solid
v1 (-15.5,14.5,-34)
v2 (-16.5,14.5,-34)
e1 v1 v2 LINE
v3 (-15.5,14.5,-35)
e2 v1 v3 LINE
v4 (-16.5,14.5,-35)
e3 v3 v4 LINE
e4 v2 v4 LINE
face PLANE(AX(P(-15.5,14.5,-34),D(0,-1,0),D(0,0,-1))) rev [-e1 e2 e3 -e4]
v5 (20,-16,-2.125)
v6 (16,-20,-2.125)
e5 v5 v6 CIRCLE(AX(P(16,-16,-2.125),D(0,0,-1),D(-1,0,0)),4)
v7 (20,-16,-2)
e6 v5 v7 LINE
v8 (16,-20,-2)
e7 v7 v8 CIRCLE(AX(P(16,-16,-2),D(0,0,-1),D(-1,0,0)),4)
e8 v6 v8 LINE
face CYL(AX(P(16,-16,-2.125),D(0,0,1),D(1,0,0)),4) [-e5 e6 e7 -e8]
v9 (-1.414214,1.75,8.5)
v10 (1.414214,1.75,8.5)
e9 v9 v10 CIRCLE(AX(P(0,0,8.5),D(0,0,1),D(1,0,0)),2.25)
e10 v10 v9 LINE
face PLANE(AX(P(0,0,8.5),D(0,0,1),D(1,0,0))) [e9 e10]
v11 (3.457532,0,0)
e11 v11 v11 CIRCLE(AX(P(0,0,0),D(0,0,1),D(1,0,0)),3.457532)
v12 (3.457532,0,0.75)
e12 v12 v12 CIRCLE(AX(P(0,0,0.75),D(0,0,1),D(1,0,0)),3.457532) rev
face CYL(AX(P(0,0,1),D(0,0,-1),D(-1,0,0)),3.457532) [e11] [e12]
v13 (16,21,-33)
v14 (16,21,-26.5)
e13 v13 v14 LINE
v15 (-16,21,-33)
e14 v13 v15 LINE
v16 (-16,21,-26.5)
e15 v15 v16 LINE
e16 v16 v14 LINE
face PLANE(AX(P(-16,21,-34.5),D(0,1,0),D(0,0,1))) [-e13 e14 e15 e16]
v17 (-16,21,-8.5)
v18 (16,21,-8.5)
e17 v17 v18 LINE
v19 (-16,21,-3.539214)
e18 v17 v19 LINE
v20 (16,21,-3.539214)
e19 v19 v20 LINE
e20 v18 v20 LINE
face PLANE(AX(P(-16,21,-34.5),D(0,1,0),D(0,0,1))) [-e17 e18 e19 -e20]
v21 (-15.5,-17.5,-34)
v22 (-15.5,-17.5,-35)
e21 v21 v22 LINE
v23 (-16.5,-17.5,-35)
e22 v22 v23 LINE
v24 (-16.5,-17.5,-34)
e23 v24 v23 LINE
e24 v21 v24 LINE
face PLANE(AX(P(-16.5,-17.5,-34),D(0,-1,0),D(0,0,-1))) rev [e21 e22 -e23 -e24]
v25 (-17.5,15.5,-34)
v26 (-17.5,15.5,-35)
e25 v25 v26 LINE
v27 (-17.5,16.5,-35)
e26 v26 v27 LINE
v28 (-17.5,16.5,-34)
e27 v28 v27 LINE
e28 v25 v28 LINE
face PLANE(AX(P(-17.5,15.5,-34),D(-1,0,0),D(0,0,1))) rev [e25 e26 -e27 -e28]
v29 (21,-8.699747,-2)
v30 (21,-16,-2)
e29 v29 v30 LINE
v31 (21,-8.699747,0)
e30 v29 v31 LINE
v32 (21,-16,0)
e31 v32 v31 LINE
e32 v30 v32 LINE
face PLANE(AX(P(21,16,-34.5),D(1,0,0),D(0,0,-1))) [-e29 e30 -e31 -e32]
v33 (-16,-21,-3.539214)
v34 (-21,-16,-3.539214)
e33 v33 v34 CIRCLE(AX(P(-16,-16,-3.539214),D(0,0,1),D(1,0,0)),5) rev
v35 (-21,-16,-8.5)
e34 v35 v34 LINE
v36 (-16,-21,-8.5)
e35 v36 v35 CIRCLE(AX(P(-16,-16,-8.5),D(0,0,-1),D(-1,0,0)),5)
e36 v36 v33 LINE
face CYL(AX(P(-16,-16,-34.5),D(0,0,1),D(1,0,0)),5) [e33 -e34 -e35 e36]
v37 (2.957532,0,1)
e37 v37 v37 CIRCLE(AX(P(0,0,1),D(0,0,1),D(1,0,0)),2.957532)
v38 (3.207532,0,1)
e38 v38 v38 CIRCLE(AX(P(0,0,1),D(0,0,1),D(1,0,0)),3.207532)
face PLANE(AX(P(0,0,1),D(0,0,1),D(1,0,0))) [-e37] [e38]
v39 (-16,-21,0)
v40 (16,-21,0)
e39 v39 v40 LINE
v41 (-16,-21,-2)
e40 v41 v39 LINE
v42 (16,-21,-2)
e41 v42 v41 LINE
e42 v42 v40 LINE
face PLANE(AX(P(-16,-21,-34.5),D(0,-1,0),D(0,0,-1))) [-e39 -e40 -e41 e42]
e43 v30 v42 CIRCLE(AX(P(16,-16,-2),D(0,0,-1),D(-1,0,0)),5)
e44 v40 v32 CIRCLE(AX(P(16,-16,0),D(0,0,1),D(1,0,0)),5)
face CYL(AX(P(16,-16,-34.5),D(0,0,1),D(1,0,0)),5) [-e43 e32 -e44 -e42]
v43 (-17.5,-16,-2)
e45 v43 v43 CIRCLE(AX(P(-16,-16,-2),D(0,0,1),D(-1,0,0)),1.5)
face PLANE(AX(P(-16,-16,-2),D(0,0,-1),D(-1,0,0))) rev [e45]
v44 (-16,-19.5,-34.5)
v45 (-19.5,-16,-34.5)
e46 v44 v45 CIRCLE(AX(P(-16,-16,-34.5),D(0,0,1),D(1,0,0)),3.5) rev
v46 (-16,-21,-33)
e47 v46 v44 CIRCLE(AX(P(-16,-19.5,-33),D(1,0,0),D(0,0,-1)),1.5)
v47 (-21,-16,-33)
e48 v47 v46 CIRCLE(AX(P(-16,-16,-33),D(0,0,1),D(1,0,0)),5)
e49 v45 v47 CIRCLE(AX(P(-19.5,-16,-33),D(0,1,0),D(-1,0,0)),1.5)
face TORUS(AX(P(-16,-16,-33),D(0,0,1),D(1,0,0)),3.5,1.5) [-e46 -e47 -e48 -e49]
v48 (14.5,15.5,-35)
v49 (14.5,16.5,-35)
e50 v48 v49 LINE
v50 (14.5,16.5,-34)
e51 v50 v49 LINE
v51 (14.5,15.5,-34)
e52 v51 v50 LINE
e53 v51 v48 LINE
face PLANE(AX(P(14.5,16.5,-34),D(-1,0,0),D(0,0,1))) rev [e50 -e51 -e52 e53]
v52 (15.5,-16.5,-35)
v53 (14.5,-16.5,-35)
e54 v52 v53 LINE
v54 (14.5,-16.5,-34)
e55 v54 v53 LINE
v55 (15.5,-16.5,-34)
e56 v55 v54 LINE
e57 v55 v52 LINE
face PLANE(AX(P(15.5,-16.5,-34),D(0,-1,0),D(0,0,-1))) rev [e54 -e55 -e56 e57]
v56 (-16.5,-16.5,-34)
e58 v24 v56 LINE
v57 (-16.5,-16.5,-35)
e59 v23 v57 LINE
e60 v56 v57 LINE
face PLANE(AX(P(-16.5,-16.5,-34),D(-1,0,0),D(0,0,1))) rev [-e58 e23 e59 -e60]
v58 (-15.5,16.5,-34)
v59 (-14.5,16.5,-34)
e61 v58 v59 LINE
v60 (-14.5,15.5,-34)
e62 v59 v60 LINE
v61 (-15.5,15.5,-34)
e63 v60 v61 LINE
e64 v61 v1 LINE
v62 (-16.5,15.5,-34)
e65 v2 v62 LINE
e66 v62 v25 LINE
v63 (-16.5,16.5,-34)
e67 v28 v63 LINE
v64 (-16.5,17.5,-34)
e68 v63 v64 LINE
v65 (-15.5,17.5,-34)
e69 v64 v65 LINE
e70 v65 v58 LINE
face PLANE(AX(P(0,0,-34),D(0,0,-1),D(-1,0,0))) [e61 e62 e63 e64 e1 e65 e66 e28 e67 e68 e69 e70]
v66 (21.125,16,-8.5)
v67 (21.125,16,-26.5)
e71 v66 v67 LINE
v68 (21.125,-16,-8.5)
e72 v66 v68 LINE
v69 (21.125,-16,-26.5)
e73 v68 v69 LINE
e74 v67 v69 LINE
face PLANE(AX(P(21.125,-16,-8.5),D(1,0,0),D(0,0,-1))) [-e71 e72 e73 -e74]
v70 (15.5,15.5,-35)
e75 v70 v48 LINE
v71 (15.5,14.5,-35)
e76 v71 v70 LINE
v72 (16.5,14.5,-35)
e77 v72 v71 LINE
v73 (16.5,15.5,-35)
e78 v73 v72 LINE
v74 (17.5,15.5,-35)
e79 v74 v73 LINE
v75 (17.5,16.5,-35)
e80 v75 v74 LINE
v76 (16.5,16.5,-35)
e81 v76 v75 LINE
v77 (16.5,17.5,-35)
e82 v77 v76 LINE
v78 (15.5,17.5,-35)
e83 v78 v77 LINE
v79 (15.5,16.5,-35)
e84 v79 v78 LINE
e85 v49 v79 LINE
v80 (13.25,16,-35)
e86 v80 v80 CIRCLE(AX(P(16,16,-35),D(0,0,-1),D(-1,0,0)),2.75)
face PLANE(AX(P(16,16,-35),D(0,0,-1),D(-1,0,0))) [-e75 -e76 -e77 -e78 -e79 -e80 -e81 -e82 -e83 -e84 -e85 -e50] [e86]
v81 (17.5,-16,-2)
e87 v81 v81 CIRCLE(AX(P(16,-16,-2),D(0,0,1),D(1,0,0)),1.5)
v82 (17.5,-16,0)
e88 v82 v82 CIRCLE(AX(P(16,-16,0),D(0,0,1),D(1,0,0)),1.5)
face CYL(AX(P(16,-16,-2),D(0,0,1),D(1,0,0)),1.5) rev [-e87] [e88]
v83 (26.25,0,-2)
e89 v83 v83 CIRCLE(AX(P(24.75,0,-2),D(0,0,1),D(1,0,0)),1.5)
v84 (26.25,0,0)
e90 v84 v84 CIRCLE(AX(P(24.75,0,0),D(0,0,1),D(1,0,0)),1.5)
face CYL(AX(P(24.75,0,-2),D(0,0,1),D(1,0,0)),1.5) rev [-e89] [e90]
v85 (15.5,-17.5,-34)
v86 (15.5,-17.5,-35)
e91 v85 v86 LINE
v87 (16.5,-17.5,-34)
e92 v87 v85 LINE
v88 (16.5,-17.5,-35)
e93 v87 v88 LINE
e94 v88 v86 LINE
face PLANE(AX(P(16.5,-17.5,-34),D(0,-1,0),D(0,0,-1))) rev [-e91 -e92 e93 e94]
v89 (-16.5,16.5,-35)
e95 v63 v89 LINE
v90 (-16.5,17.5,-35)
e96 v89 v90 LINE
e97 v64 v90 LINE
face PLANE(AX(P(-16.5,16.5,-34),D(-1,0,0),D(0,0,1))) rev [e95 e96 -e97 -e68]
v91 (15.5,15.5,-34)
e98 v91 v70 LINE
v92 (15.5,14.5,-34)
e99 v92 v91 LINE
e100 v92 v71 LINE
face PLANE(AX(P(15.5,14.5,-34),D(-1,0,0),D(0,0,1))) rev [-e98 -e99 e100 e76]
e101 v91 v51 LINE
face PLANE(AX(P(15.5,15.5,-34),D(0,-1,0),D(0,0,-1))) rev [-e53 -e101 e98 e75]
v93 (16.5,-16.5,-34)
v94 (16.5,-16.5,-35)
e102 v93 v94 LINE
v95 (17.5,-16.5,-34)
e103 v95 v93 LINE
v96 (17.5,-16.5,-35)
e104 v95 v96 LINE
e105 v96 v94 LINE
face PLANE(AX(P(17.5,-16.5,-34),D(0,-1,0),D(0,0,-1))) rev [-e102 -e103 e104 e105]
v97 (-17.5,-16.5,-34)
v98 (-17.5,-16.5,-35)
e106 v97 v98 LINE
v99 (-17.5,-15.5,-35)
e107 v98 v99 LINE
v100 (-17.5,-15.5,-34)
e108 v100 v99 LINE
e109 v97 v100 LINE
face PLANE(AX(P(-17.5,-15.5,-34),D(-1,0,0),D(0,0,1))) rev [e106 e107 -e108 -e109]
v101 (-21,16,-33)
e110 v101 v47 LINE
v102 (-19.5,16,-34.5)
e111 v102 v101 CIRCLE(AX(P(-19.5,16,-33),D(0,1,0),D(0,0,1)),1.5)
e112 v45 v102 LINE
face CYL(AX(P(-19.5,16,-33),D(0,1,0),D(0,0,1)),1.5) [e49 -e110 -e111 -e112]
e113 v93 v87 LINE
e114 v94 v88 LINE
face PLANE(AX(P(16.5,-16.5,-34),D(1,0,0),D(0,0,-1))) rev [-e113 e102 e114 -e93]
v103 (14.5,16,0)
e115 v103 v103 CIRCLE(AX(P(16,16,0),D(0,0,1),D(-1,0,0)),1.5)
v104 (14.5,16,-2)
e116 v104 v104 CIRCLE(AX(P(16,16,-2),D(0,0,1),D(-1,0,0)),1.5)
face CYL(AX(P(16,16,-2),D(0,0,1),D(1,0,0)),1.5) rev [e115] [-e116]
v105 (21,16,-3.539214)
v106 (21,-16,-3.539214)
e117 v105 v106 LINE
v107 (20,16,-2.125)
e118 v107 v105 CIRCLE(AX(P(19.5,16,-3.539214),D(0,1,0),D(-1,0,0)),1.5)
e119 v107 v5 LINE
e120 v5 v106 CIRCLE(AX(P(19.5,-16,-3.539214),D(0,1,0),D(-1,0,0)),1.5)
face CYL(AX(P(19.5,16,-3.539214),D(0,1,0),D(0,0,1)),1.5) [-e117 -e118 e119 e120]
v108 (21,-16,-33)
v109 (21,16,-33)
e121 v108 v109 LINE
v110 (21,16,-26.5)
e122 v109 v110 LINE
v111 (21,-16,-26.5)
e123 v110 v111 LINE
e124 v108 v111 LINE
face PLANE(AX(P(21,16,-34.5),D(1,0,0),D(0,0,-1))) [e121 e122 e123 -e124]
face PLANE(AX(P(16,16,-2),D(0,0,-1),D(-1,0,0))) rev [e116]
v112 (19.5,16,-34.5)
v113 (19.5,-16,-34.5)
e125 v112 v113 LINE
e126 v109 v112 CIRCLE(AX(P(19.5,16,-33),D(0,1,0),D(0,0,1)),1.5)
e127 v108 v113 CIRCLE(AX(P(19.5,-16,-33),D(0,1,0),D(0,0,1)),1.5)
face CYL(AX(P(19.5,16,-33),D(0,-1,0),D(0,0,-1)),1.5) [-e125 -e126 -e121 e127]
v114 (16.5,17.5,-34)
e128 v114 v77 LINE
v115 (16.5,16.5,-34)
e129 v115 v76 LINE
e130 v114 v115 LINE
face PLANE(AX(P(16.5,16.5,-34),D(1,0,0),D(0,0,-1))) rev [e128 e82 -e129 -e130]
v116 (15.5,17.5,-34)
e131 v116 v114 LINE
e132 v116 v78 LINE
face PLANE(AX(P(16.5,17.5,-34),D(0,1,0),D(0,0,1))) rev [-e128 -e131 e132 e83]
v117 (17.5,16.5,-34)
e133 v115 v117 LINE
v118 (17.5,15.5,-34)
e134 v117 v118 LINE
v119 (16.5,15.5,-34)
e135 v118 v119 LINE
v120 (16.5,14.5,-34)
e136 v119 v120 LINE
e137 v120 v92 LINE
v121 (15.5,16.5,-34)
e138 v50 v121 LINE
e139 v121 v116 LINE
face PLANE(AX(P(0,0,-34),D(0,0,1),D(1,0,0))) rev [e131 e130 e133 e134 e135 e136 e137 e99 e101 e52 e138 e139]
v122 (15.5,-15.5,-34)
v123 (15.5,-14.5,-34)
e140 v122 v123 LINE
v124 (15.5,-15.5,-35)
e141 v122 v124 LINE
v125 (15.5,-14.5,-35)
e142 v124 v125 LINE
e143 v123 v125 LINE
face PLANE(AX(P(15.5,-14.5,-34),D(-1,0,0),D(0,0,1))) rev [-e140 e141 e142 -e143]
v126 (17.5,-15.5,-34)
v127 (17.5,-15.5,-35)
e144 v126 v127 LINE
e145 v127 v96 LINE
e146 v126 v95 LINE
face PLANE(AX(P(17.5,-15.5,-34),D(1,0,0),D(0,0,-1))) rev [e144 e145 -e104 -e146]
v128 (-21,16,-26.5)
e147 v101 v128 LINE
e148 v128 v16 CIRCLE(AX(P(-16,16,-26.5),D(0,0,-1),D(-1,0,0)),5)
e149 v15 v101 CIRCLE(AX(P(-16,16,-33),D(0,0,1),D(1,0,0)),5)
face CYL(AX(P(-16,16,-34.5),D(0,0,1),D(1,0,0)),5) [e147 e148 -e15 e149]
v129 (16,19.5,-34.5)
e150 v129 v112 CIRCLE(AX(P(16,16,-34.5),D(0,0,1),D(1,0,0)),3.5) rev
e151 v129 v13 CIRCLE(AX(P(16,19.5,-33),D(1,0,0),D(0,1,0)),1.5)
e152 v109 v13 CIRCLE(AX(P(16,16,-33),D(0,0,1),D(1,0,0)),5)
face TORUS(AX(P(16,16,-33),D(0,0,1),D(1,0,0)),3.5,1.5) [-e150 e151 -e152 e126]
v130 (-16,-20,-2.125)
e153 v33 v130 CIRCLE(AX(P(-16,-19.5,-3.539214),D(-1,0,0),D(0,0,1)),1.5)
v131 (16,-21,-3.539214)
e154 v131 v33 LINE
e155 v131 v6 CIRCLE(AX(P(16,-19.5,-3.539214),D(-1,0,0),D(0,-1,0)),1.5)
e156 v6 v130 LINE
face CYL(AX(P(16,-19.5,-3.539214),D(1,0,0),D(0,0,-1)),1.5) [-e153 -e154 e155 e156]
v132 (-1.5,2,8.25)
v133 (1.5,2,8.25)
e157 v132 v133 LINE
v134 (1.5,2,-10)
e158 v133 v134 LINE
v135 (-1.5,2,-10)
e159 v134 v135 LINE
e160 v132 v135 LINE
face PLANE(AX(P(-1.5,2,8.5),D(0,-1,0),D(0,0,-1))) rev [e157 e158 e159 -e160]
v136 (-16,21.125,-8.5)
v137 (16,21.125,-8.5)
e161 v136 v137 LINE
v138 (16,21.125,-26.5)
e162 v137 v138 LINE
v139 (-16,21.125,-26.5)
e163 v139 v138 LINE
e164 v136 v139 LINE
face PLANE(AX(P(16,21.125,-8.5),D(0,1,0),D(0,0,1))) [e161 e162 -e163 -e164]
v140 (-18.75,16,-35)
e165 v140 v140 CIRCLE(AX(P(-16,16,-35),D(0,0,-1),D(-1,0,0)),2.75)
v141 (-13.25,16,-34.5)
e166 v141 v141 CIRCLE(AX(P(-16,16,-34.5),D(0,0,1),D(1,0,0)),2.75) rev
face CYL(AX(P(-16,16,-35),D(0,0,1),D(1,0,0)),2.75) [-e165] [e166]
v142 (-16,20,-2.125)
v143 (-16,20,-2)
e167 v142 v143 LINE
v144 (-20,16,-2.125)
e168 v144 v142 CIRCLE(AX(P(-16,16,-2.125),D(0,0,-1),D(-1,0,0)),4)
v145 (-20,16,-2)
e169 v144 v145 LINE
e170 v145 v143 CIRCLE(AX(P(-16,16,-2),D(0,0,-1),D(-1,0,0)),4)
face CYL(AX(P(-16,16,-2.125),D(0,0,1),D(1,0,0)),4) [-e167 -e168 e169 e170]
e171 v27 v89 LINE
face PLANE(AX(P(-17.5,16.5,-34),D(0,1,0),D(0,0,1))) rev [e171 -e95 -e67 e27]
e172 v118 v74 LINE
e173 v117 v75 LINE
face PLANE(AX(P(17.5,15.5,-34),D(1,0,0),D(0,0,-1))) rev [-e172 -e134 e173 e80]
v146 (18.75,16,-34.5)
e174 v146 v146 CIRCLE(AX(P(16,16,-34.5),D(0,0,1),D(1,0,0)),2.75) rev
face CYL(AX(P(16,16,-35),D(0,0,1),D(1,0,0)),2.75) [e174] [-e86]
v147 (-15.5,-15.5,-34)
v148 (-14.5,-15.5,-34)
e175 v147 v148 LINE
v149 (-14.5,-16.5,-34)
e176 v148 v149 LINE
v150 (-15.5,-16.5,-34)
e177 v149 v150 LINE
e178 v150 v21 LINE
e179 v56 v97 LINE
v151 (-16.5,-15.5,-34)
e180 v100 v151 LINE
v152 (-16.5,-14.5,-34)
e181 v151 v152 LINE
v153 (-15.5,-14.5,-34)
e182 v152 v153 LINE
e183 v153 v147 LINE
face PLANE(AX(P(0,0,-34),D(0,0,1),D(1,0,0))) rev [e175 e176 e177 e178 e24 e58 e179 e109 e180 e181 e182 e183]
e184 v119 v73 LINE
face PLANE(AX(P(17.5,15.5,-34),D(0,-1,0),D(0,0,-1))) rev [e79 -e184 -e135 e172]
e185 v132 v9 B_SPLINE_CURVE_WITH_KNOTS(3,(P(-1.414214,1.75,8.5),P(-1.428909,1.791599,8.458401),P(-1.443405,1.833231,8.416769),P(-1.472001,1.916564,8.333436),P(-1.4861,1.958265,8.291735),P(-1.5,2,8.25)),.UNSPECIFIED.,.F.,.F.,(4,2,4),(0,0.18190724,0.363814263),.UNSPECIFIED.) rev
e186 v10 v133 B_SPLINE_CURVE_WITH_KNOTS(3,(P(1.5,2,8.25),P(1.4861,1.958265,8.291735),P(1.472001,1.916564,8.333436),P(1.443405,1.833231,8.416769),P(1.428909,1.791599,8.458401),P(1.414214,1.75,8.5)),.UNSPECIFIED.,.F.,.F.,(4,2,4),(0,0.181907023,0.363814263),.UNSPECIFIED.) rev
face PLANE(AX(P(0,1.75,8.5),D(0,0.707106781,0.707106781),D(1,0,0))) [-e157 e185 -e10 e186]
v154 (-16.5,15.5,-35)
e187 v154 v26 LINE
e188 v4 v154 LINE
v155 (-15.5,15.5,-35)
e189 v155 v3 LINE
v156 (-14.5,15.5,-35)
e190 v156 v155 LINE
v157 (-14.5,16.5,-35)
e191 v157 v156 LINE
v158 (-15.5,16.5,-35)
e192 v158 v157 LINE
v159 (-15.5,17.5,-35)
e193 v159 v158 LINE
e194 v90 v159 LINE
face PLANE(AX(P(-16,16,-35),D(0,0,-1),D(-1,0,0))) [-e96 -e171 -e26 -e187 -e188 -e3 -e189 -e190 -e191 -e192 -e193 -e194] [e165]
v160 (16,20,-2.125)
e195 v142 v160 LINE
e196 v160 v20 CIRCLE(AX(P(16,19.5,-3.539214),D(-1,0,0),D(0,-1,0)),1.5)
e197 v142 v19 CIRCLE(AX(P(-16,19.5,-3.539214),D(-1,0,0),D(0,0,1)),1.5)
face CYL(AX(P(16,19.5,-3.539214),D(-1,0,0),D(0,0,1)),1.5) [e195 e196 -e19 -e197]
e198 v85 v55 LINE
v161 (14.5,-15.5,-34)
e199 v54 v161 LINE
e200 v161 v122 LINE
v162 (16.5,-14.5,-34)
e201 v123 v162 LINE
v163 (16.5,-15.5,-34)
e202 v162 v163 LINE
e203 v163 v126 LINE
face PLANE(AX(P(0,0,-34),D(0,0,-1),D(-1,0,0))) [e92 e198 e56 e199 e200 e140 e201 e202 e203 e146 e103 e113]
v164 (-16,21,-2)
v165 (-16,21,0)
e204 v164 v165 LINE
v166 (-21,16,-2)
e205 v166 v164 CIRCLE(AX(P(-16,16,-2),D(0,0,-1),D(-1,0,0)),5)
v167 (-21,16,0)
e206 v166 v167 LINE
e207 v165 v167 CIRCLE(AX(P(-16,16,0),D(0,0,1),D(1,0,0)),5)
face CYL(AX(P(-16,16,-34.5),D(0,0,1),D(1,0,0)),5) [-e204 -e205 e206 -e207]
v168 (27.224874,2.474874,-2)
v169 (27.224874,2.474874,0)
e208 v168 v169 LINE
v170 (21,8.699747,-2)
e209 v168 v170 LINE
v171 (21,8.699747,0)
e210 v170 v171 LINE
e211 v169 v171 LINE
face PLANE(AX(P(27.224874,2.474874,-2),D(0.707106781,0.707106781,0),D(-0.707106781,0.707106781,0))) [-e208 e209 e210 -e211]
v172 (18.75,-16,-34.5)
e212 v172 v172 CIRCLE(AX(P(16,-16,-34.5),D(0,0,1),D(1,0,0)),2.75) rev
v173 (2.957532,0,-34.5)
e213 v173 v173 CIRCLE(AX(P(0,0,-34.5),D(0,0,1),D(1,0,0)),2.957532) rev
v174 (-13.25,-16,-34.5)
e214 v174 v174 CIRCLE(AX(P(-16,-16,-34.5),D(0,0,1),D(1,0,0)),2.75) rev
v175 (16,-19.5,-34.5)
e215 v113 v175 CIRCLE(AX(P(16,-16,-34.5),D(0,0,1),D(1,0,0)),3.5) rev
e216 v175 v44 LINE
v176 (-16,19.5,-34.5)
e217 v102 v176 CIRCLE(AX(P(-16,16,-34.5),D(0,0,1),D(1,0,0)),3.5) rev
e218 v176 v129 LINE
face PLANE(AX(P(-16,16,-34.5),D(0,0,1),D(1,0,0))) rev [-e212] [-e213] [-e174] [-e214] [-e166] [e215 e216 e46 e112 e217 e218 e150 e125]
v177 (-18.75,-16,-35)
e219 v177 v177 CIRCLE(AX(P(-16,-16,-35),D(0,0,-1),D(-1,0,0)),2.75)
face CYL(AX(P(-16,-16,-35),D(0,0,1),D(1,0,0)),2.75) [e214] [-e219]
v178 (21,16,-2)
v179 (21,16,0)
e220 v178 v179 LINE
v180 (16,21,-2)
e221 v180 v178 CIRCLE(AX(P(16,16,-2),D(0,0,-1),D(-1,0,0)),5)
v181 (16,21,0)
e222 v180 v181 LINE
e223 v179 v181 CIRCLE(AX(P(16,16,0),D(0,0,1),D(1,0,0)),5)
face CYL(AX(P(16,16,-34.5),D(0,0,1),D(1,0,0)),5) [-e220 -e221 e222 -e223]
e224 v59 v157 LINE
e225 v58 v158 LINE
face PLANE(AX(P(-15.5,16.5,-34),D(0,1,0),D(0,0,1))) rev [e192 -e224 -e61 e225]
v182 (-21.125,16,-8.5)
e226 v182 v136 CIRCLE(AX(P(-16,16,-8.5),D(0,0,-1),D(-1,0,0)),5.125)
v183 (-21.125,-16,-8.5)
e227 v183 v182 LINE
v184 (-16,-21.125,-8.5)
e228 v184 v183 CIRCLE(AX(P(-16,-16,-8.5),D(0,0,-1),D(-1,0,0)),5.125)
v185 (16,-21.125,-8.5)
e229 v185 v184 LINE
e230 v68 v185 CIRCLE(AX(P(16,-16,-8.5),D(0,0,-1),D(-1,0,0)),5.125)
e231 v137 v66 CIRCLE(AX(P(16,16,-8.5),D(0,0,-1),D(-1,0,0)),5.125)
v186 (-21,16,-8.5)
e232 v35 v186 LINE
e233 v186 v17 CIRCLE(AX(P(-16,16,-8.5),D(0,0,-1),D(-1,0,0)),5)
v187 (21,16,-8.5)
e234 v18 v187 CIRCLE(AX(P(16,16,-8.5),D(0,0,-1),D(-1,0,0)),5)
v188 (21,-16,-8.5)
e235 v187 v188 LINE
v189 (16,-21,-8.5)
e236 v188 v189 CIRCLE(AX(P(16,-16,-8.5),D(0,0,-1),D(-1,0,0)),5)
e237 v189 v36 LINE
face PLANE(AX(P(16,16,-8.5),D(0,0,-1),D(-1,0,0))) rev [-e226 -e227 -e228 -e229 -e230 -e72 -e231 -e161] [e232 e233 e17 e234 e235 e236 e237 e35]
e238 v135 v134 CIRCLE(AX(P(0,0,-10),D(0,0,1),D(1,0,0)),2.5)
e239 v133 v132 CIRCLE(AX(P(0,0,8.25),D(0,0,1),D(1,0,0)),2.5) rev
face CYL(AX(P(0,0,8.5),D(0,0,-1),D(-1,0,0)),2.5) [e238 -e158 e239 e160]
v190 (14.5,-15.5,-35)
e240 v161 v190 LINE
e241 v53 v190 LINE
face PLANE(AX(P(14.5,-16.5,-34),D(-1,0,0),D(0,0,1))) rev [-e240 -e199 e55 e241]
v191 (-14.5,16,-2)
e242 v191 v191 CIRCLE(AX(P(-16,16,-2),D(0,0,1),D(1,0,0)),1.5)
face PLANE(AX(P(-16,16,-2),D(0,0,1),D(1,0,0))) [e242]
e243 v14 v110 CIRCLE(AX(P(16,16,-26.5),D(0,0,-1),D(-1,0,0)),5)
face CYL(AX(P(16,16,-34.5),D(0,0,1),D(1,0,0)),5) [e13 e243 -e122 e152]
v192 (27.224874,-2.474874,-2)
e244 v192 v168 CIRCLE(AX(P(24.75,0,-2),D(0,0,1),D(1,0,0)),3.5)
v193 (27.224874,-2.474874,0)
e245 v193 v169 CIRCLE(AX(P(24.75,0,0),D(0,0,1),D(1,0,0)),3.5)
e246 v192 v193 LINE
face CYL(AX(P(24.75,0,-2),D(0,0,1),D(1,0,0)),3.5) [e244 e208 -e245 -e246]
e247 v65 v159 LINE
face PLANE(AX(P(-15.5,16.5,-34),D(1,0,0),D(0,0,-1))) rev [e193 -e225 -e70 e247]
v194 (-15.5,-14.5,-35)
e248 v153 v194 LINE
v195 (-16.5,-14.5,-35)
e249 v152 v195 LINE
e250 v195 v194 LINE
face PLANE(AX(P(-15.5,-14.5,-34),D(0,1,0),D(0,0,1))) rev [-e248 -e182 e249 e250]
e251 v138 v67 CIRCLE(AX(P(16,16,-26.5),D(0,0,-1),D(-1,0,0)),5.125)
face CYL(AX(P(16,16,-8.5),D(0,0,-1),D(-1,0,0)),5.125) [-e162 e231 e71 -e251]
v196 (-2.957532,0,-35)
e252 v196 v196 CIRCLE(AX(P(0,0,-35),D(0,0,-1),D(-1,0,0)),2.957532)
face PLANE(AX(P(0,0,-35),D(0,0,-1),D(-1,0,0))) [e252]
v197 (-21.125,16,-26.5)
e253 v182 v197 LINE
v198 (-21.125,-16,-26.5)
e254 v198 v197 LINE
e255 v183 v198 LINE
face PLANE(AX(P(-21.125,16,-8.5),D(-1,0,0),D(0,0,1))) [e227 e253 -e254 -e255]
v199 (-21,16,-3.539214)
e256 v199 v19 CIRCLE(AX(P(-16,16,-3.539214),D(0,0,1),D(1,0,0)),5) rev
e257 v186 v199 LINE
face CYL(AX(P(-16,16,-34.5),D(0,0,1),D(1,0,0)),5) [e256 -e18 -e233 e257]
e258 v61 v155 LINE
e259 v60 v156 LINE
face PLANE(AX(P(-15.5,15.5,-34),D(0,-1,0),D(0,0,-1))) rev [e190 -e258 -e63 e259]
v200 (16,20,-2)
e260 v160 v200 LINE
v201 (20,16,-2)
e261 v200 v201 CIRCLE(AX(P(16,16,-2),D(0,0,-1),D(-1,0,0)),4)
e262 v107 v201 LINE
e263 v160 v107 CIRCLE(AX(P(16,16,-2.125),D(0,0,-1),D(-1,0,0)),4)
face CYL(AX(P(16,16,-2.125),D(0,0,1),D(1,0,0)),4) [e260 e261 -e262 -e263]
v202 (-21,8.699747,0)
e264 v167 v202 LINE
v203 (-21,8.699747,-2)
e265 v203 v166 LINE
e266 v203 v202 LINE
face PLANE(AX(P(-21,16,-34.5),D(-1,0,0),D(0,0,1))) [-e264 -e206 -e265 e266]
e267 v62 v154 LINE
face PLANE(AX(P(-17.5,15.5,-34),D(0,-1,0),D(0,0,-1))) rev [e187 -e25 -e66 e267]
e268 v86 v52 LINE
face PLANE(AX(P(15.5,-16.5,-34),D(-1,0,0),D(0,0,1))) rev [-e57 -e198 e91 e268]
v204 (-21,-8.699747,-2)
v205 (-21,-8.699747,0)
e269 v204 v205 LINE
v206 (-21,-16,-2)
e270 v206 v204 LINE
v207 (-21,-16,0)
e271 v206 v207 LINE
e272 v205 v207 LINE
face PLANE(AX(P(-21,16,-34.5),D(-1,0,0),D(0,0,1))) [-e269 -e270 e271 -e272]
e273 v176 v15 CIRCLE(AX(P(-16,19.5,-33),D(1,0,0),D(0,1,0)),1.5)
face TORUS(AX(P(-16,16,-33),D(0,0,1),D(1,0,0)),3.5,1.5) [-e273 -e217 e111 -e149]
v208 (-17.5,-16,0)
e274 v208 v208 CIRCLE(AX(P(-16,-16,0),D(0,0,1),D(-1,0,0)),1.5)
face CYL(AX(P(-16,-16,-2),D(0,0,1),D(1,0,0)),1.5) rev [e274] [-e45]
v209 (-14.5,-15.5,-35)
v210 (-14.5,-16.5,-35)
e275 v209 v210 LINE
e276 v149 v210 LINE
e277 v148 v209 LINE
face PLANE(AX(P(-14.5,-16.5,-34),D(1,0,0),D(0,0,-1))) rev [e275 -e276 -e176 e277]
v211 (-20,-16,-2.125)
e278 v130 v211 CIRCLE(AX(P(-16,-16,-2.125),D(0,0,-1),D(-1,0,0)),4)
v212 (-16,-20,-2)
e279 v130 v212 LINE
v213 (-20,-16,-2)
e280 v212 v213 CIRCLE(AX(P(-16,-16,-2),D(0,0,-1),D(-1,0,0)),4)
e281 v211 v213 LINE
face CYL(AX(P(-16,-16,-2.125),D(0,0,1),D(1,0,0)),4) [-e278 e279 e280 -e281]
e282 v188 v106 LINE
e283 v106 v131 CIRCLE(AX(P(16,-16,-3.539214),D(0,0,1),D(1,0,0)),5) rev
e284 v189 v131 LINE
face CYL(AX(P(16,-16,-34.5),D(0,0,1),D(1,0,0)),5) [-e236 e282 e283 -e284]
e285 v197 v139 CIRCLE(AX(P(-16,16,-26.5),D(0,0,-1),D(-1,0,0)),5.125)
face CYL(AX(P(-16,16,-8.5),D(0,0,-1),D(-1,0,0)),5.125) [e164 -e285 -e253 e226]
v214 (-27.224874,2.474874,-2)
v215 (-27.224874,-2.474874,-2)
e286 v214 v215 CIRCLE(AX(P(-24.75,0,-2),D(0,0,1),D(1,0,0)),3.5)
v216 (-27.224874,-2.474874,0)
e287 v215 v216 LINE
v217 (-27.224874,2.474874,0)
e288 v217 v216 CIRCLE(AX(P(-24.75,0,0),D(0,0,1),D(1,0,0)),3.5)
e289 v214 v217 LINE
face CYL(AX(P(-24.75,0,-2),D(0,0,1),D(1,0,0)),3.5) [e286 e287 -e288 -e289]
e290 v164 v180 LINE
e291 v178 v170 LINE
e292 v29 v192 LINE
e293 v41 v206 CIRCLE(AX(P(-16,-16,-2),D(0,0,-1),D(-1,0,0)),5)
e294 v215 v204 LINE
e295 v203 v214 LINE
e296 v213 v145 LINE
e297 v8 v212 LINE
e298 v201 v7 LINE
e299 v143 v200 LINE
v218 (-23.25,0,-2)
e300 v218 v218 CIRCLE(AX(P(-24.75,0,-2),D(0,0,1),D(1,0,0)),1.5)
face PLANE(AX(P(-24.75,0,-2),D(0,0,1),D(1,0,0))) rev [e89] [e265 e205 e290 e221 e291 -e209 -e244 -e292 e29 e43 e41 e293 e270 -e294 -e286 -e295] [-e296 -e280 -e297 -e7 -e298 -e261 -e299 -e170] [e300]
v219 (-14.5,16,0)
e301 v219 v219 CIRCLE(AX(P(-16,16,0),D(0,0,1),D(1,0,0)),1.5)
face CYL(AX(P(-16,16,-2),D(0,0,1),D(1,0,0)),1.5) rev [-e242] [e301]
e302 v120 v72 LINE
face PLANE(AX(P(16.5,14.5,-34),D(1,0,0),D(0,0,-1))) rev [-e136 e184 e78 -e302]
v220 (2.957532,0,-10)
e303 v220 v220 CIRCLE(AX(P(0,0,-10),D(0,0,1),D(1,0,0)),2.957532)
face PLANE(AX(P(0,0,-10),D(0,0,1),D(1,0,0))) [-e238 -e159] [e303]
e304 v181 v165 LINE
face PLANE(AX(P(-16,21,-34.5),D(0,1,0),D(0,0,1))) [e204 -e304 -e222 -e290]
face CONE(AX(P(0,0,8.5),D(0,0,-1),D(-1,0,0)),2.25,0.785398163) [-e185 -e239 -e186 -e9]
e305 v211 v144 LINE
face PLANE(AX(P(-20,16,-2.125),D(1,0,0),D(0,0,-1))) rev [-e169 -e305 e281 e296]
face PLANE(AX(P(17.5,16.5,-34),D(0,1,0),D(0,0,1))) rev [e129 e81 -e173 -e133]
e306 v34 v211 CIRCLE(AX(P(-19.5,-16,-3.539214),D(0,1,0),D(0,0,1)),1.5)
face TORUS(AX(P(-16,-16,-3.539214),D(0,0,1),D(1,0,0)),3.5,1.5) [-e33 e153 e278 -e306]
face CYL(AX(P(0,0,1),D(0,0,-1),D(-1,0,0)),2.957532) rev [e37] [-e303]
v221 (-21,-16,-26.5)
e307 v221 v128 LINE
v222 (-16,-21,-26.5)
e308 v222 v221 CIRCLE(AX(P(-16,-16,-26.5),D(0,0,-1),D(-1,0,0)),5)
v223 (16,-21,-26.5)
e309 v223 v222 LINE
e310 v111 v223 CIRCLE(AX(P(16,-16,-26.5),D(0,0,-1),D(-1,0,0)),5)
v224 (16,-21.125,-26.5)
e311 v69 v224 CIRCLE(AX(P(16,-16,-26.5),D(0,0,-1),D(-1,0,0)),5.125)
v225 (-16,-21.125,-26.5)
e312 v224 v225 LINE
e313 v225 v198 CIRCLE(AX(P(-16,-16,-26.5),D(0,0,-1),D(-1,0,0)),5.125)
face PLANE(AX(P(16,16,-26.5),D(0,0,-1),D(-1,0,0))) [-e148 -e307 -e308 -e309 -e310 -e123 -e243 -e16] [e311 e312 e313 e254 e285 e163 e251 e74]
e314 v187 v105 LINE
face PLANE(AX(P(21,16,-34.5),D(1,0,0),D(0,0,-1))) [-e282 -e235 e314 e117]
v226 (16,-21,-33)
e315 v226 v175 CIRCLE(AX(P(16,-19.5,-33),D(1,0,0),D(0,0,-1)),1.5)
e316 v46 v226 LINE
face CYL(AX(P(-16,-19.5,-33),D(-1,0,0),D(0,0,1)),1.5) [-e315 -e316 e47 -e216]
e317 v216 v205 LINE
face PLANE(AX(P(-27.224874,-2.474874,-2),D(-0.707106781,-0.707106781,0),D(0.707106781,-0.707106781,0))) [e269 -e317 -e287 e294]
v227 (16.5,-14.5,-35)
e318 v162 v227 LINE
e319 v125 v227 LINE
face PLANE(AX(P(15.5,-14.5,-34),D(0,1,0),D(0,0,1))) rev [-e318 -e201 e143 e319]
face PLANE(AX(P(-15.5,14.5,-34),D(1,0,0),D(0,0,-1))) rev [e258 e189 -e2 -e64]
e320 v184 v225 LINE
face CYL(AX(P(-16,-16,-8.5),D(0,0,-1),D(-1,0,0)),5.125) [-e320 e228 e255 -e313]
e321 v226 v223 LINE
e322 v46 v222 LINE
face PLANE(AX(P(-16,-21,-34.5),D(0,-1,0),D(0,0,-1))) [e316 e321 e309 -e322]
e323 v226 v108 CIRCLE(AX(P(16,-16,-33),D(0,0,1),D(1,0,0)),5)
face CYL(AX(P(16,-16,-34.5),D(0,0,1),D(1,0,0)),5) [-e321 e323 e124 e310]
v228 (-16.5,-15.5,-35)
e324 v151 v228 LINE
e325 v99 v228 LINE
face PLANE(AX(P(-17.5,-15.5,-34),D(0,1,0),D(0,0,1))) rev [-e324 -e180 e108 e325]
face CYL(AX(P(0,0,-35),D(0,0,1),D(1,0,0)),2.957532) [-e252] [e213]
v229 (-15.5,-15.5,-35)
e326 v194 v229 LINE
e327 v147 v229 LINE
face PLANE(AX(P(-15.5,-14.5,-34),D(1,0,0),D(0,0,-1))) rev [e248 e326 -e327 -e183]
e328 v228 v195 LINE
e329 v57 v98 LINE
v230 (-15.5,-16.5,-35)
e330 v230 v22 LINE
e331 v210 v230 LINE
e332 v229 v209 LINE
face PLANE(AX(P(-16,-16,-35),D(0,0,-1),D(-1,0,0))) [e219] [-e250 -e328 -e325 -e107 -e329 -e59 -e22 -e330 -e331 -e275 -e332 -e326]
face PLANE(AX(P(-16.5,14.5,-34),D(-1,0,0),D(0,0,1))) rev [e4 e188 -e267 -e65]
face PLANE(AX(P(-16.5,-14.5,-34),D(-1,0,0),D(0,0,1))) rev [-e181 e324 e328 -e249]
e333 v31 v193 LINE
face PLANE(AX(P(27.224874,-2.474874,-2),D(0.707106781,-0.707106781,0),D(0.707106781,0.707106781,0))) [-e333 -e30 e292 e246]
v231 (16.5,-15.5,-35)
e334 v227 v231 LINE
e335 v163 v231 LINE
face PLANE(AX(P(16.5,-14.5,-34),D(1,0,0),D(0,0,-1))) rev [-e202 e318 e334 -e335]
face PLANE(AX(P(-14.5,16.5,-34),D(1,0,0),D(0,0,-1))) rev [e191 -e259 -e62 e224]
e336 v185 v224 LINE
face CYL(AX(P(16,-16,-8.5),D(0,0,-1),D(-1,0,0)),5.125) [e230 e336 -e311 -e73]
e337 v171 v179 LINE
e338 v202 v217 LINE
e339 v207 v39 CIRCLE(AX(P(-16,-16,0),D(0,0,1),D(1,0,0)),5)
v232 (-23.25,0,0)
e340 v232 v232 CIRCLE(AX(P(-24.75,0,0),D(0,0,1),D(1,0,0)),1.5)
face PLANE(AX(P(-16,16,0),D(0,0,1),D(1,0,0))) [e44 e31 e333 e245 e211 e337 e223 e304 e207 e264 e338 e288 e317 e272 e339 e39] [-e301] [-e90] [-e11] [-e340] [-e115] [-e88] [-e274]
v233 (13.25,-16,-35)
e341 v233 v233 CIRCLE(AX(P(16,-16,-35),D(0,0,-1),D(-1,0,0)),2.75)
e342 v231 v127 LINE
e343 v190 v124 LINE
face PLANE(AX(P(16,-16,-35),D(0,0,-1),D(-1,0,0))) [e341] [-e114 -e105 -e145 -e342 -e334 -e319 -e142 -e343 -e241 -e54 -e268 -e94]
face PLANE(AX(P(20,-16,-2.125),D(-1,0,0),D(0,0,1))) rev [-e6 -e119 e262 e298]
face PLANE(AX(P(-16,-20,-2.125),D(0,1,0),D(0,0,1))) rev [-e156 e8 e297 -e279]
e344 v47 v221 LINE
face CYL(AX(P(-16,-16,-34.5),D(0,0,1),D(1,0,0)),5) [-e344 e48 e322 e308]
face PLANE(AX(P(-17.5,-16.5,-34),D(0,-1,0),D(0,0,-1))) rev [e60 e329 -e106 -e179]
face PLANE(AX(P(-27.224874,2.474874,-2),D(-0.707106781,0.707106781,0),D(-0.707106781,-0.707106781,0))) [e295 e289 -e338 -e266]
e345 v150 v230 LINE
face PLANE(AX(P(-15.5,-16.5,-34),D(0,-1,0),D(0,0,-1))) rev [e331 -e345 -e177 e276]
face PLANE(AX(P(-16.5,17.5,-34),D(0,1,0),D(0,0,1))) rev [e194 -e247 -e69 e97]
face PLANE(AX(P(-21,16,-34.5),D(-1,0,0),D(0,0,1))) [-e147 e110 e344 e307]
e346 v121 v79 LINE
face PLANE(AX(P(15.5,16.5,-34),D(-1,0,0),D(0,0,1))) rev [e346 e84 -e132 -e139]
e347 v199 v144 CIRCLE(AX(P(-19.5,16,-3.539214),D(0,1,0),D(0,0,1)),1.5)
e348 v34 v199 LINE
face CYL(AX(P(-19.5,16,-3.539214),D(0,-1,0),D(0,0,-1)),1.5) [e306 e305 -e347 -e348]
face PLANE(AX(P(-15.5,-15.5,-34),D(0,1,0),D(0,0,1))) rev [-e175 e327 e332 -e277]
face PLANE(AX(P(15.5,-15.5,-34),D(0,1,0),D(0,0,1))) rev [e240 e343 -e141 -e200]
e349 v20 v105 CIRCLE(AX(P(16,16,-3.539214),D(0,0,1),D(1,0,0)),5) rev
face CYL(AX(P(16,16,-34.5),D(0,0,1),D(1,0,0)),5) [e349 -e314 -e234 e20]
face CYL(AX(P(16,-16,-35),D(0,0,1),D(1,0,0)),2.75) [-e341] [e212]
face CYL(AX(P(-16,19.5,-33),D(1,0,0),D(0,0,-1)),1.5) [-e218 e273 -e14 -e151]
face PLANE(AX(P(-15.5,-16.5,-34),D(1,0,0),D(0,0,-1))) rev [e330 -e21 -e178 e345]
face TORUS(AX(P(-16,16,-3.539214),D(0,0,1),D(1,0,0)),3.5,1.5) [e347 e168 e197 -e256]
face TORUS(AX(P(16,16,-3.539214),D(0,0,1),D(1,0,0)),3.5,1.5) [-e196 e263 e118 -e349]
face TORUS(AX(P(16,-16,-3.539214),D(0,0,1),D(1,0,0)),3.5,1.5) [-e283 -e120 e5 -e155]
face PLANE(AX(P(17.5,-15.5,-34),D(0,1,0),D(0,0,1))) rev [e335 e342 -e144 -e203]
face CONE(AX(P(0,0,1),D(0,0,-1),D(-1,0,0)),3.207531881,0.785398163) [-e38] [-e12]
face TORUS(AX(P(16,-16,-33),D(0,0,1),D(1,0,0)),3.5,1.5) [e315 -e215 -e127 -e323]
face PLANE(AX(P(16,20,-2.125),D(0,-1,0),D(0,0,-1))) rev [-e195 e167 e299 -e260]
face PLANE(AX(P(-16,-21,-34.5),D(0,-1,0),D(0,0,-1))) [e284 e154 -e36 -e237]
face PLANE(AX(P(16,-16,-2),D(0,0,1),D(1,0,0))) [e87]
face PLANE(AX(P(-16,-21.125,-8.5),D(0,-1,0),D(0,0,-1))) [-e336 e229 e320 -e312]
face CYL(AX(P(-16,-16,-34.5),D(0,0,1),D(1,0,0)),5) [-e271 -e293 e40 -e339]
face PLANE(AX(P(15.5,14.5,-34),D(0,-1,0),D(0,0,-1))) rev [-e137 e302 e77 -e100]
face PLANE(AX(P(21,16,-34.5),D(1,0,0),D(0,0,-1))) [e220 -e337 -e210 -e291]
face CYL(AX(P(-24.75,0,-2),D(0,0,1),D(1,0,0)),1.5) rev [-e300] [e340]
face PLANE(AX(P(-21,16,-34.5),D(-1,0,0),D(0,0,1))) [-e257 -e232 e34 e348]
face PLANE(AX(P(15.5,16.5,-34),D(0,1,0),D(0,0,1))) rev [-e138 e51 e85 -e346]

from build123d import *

# Parameters (mm, degrees)
BOSS_EXTRUDE1_DEPTH = 34.5
SKETCH3_R           = 1.5
BOSS_EXTRUDE2_DEPTH = 2
BOSS_EXTRUDE3_DEPTH = 8.5
SKETCH5_R           = 3.457531881
SKETCH5_R_2         = 2.957531881
BOSS_EXTRUDE4_DEPTH = 1
CUT_EXTRUDE1_START  = -10
SKETCH6_R           = 2.957531881
CUT_EXTRUDE1_DEPTH  = 10
CHAMFER1_SIZE       = 0.25
CUT_EXTRUDE2_DEPTH  = 0.125
FILLET1_R           = 1.5
SKETCH8_R           = 1.5
CUT_EXTRUDE3_DEPTH  = 2
BOSS_EXTRUDE5_START = 0.5
SKETCH9_R           = 2.957531881
SKETCH9_R_2         = 2.75
BOSS_EXTRUDE5_DEPTH = 0.5
CUT_EXTRUDE4_DEPTH  = 1
BOSS_EXTRUDE6_START = -18
BOSS_EXTRUDE6_DEPTH = 18


with BuildPart() as part:
    # Sketch2 → Boss-Extrude1 (new body)
    with BuildSketch(Plane.XY):
        with BuildLine():
            Line((-21, 16), (-21, -16))
            ThreePointArc((-21, -16), (-19.535533906, -19.535533906), (-16, -21))
            Line((-16, -21), (16, -21))
            ThreePointArc((16, -21), (19.535533906, -19.535533906), (21, -16))
            Line((21, -16), (21, 16))
            ThreePointArc((21, 16), (19.535533906, 19.535533906), (16, 21))
            Line((16, 21), (-16, 21))
            ThreePointArc((-16, 21), (-19.535533906, 19.535533906), (-21, 16))
        make_face()
    extrude(amount=-BOSS_EXTRUDE1_DEPTH)

    # Sketch3 → Boss-Extrude2 (add)
    with BuildSketch(Plane.XY):
        with BuildLine():
            Line((-27.224873734, 2.474873734), (-21, 8.699747468))
            Line((-21, 8.699747468), (-21, 16))
            ThreePointArc((-21, 16), (-19.535533906, 19.535533906), (-16, 21))
            Line((-16, 21), (16, 21))
            ThreePointArc((16, 21), (19.535533906, 19.535533906), (21, 16))
            Line((21, 16), (21, 8.699747468))
            Line((21, 8.699747468), (27.224873734, 2.474873734))
            ThreePointArc((27.224873734, 2.474873734), (28.25, 0), (27.224873734, -2.474873734))
            Line((27.224873734, -2.474873734), (21, -8.699747468))
            Line((21, -8.699747468), (21, -16))
            ThreePointArc((21, -16), (19.535533906, -19.535533906), (16, -21))
            Line((16, -21), (-16, -21))
            ThreePointArc((-16, -21), (-19.535533906, -19.535533906), (-21, -16))
            Line((-21, -16), (-21, -8.699747468))
            Line((-21, -8.699747468), (-27.224873734, -2.474873734))
            ThreePointArc((-27.224873734, -2.474873734), (-28.25, 0), (-27.224873734, 2.474873734))
        make_face()
        with Locations((-24.75, 0)):
            Circle(SKETCH3_R, mode=Mode.SUBTRACT)
        with Locations((24.75, 0)):
            Circle(SKETCH3_R, mode=Mode.SUBTRACT)
    extrude(amount=-BOSS_EXTRUDE2_DEPTH)

    # Sketch4 → Boss-Extrude3 (add)
    with BuildSketch(Plane.XY):
        with BuildLine():
            Line((-1.5, 2), (1.5, 2))
            ThreePointArc((1.5, 2), (0, -2.5), (-1.5, 2))
        make_face()
    extrude(amount=BOSS_EXTRUDE3_DEPTH)

    # Sketch5 → Boss-Extrude4 (add)
    with BuildSketch(Plane.XY):
        Circle(SKETCH5_R)
        Circle(SKETCH5_R_2, mode=Mode.SUBTRACT)
    extrude(amount=BOSS_EXTRUDE4_DEPTH)

    # Sketch6 → Cut-Extrude1 (cut)
    with BuildSketch(Plane.XY.offset(CUT_EXTRUDE1_START)):
        Circle(SKETCH6_R)
        with BuildLine():
            Line((1.5, 2), (-1.5, 2))
            ThreePointArc((-1.5, 2), (0, -2.5), (1.5, 2))
        make_face(mode=Mode.SUBTRACT)
    extrude(amount=CUT_EXTRUDE1_DEPTH, mode=Mode.SUBTRACT)

    # Chamfer1
    chamfer1_edges = [part.edges().sort_by_distance(p)[0] for p in [
        (0, -2.5, 8.5),
        (0, 2, 8.5),
        (-3.457531881, 0, 1),
    ]]
    chamfer(chamfer1_edges, length=CHAMFER1_SIZE)

    # Sketch7 → Cut-Extrude2 (cut)
    with BuildSketch(Plane(origin=(0, 0, -2), x_dir=(-1, 0, 0), z_dir=(0, 0, -1))):
        with BuildLine():
            Line((-16, 21), (16, 21))
            ThreePointArc((16, 21), (19.535533906, 19.535533906), (21, 16))
            Line((21, 16), (21, -16))
            ThreePointArc((21, -16), (19.535533906, -19.535533906), (16, -21))
            Line((16, -21), (-16, -21))
            ThreePointArc((-16, -21), (-19.535533906, -19.535533906), (-21, -16))
            Line((-21, -16), (-21, 16))
            ThreePointArc((-21, 16), (-19.535533906, 19.535533906), (-16, 21))
        make_face()
        with BuildLine():
            Line((-16, 20), (16, 20))
            ThreePointArc((16, 20), (18.828427125, 18.828427125), (20, 16))
            Line((20, 16), (20, -16))
            ThreePointArc((20, -16), (18.828427125, -18.828427125), (16, -20))
            Line((16, -20), (-16, -20))
            ThreePointArc((-16, -20), (-18.828427125, -18.828427125), (-20, -16))
            Line((-20, -16), (-20, 16))
            ThreePointArc((-20, 16), (-18.828427125, 18.828427125), (-16, 20))
        make_face(mode=Mode.SUBTRACT)
    extrude(amount=CUT_EXTRUDE2_DEPTH, mode=Mode.SUBTRACT)

    # Fillet1
    # the kernel refuses this fillet: 1.5 mm, written as the material it takes off along each edge
    with BuildSketch(Plane(origin=(-16, -16, -34.5), x_dir=(-1, 0, 0), z_dir=(0, 1, 0))) as fillet1_piece_1:
        with BuildLine():
            CenterArc((5 - FILLET1_R, FILLET1_R), FILLET1_R, 270, 90)
            Line((5 - FILLET1_R, 0), (5 - FILLET1_R, -FILLET1_R * 0.02))
            Line((5 - FILLET1_R, -FILLET1_R * 0.02), (5 + FILLET1_R * 0.02, -FILLET1_R * 0.02))
            Line((5 + FILLET1_R * 0.02, -FILLET1_R * 0.02), (5 + FILLET1_R * 0.02, FILLET1_R))
            Line((5 + FILLET1_R * 0.02, FILLET1_R), (5, FILLET1_R))
        make_face()
    revolve(axis=Axis((-16, -16, -34.5), (0, 0, 1)), revolution_arc=90, mode=Mode.SUBTRACT)
    with BuildSketch(Plane(origin=(-16, -21, -34.5), x_dir=(0, 0, 1), z_dir=(1, 0, 0)), Plane(origin=(21, -16, -34.5), x_dir=(0, 0, 1), z_dir=(0, 1, 0)), Plane(origin=(16, 21, -34.5), x_dir=(0, 0, 1), z_dir=(-1, 0, 0)), Plane(origin=(-21, 16, -34.5), x_dir=(0, 0, 1), z_dir=(0, -1, 0))) as fillet1_piece_2:
        with BuildLine():
            CenterArc((FILLET1_R, -FILLET1_R), FILLET1_R, 90, 90)
            Line((0, -FILLET1_R), (-FILLET1_R * 0.02, -FILLET1_R))
            Line((-FILLET1_R * 0.02, -FILLET1_R), (-FILLET1_R * 0.02, FILLET1_R * 0.02))
            Line((-FILLET1_R * 0.02, FILLET1_R * 0.02), (FILLET1_R, FILLET1_R * 0.02))
            Line((FILLET1_R, FILLET1_R * 0.02), (FILLET1_R, 0))
        make_face()
    extrude(amount=32, mode=Mode.SUBTRACT)
    with BuildSketch(Plane(origin=(16, 16, -2.125), x_dir=(1, 0, 0), z_dir=(0, -1, 0))) as fillet1_piece_3:
        with BuildLine():
            CenterArc((3.5, -1.414213562), FILLET1_R, 0, 70.528779366)
            Line((5, -1.414213562), (5.03, -1.414213562))
            Line((5.03, -1.414213562), (5.03, 0))
            Line((5.03, 0), (5, 0.03))
            ThreePointArc((5, 0.03), (4.5, 0.03), (4.01, 0.028284271))
            Line((4.01, 0.028284271), (4, 0))
        make_face()
    revolve(axis=Axis((16, 16, -2.125), (0, 0, 1)), revolution_arc=90, mode=Mode.SUBTRACT)
    with BuildSketch(Plane(origin=(21, -16, -2.125), x_dir=(-1, 0, 0), z_dir=(0, 1, 0)), Plane(origin=(-16, -21, -2.125), x_dir=(0, 1, 0), z_dir=(1, 0, 0)), Plane(origin=(-21, 16, -2.125), x_dir=(1, 0, 0), z_dir=(0, -1, 0)), Plane(origin=(16, 21, -2.125), x_dir=(0, -1, 0), z_dir=(-1, 0, 0))) as fillet1_piece_4:
        with BuildLine():
            CenterArc((1.5, -1.414213562), FILLET1_R, 109.471220634, 70.528779366)
            Line((0, -1.414213562), (-0.03, -1.414213562))
            Line((-0.03, -1.414213562), (-0.03, 0))
            Line((-0.03, 0), (0, 0.03))
            ThreePointArc((0, 0.03), (0.5, 0.03), (0.99, 0.028284271))
            Line((0.99, 0.028284271), (1, 0))
        make_face()
    extrude(amount=32, mode=Mode.SUBTRACT)
    with BuildSketch(Plane(origin=(16, -16, -2.125), x_dir=(0, -1, 0), z_dir=(-1, 0, 0))) as fillet1_piece_5:
        with BuildLine():
            CenterArc((3.5, -1.414213562), FILLET1_R, 0, 70.528779366)
            Line((5, -1.414213562), (5.03, -1.414213562))
            Line((5.03, -1.414213562), (5.03, 0))
            Line((5.03, 0), (5, 0.03))
            ThreePointArc((5, 0.03), (4.5, 0.03), (4.01, 0.028284271))
            Line((4.01, 0.028284271), (4, 0))
        make_face()
    revolve(axis=Axis((16, -16, -2.125), (0, 0, 1)), revolution_arc=90, mode=Mode.SUBTRACT)
    with BuildSketch(Plane(origin=(-16, -16, -2.125), x_dir=(-1, 0, 0), z_dir=(0, 1, 0))) as fillet1_piece_6:
        with BuildLine():
            CenterArc((3.5, -1.414213562), FILLET1_R, 0, 70.528779366)
            Line((5, -1.414213562), (5.03, -1.414213562))
            Line((5.03, -1.414213562), (5.03, 0))
            Line((5.03, 0), (5, 0.03))
            ThreePointArc((5, 0.03), (4.5, 0.03), (4.01, 0.028284271))
            Line((4.01, 0.028284271), (4, 0))
        make_face()
    revolve(axis=Axis((-16, -16, -2.125), (0, 0, 1)), revolution_arc=90, mode=Mode.SUBTRACT)
    with BuildSketch(Plane(origin=(-16, 16, -2.125), x_dir=(0, 1, 0), z_dir=(1, 0, 0))) as fillet1_piece_7:
        with BuildLine():
            CenterArc((3.5, -1.414213562), FILLET1_R, 0, 70.528779366)
            Line((5, -1.414213562), (5.03, -1.414213562))
            Line((5.03, -1.414213562), (5.03, 0))
            Line((5.03, 0), (5, 0.03))
            ThreePointArc((5, 0.03), (4.5, 0.03), (4.01, 0.028284271))
            Line((4.01, 0.028284271), (4, 0))
        make_face()
    revolve(axis=Axis((-16, 16, -2.125), (0, 0, 1)), revolution_arc=90, mode=Mode.SUBTRACT)
    with BuildSketch(Plane(origin=(16, -16, -34.5), x_dir=(0, -1, 0), z_dir=(-1, 0, 0))) as fillet1_piece_8:
        with BuildLine():
            CenterArc((5 - FILLET1_R, FILLET1_R), FILLET1_R, 270, 90)
            Line((5 - FILLET1_R, 0), (5 - FILLET1_R, -FILLET1_R * 0.02))
            Line((5 - FILLET1_R, -FILLET1_R * 0.02), (5 + FILLET1_R * 0.02, -FILLET1_R * 0.02))
            Line((5 + FILLET1_R * 0.02, -FILLET1_R * 0.02), (5 + FILLET1_R * 0.02, FILLET1_R))
            Line((5 + FILLET1_R * 0.02, FILLET1_R), (5, FILLET1_R))
        make_face()
    revolve(axis=Axis((16, -16, -34.5), (0, 0, 1)), revolution_arc=90, mode=Mode.SUBTRACT)
    with BuildSketch(Plane(origin=(16, 16, -34.5), x_dir=(1, 0, 0), z_dir=(0, -1, 0))) as fillet1_piece_9:
        with BuildLine():
            CenterArc((5 - FILLET1_R, FILLET1_R), FILLET1_R, 270, 90)
            Line((5 - FILLET1_R, 0), (5 - FILLET1_R, -FILLET1_R * 0.02))
            Line((5 - FILLET1_R, -FILLET1_R * 0.02), (5 + FILLET1_R * 0.02, -FILLET1_R * 0.02))
            Line((5 + FILLET1_R * 0.02, -FILLET1_R * 0.02), (5 + FILLET1_R * 0.02, FILLET1_R))
            Line((5 + FILLET1_R * 0.02, FILLET1_R), (5, FILLET1_R))
        make_face()
    revolve(axis=Axis((16, 16, -34.5), (0, 0, 1)), revolution_arc=90, mode=Mode.SUBTRACT)
    with BuildSketch(Plane(origin=(-16, 16, -34.5), x_dir=(0, 1, 0), z_dir=(1, 0, 0))) as fillet1_piece_10:
        with BuildLine():
            CenterArc((5 - FILLET1_R, FILLET1_R), FILLET1_R, 270, 90)
            Line((5 - FILLET1_R, 0), (5 - FILLET1_R, -FILLET1_R * 0.02))
            Line((5 - FILLET1_R, -FILLET1_R * 0.02), (5 + FILLET1_R * 0.02, -FILLET1_R * 0.02))
            Line((5 + FILLET1_R * 0.02, -FILLET1_R * 0.02), (5 + FILLET1_R * 0.02, FILLET1_R))
            Line((5 + FILLET1_R * 0.02, FILLET1_R), (5, FILLET1_R))
        make_face()
    revolve(axis=Axis((-16, 16, -34.5), (0, 0, 1)), revolution_arc=90, mode=Mode.SUBTRACT)

    # Sketch8 → Cut-Extrude3 (cut)
    with BuildSketch(Plane.XY):
        with Locations((-16, 16)):
            Circle(SKETCH8_R)
        with Locations(Location((16, 16, 0), (0, 0, 180))):
            Circle(SKETCH8_R)
        with Locations((16, -16)):
            Circle(SKETCH8_R)
        with Locations(Location((-16, -16, 0), (0, 0, 180))):
            Circle(SKETCH8_R)
    extrude(amount=-CUT_EXTRUDE3_DEPTH, mode=Mode.SUBTRACT)

    # Sketch9 → Boss-Extrude5 (add)
    with BuildSketch(Plane(origin=(0, 0, -34.5), x_dir=(-1, 0, 0), z_dir=(0, 0, -1)).offset(BOSS_EXTRUDE5_START)):
        with Locations(Location((0, 0, 0), (0, 0, 180))):
            Circle(SKETCH9_R)
        with Locations(Location((-16, 16, 0), (0, 0, 180))):
            Circle(SKETCH9_R_2)
        with Locations(Location((16, 16, 0), (0, 0, 180))):
            Circle(SKETCH9_R_2)
        with Locations(Location((16, -16, 0), (0, 0, 180))):
            Circle(SKETCH9_R_2)
        with Locations(Location((-16, -16, 0), (0, 0, 180))):
            Circle(SKETCH9_R_2)
    extrude(amount=-BOSS_EXTRUDE5_DEPTH)

    # Sketch10 → Cut-Extrude4 (cut)
    with BuildSketch(Plane(origin=(0, 0, -35), x_dir=(-1, 0, 0), z_dir=(0, 0, -1))):
        Polygon((-15.5, 14.5), (-15.5, 15.5), (-14.5, 15.5), (-14.5, 16.5), (-15.5, 16.5), (-15.5, 17.5), (-16.5, 17.5), (-16.5, 16.5), (-17.5, 16.5), (-17.5, 15.5), (-16.5, 15.5), (-16.5, 14.5), align=None)
        Polygon((15.5, 16.5), (15.5, 17.5), (16.5, 17.5), (16.5, 16.5), (17.5, 16.5), (17.5, 15.5), (16.5, 15.5), (16.5, 14.5), (15.5, 14.5), (15.5, 15.5), (14.5, 15.5), (14.5, 16.5), align=None)
        Polygon((15.5, -14.5), (15.5, -15.5), (14.5, -15.5), (14.5, -16.5), (15.5, -16.5), (15.5, -17.5), (16.5, -17.5), (16.5, -16.5), (17.5, -16.5), (17.5, -15.5), (16.5, -15.5), (16.5, -14.5), align=None)
        Polygon((-15.5, -16.5), (-15.5, -17.5), (-16.5, -17.5), (-16.5, -16.5), (-17.5, -16.5), (-17.5, -15.5), (-16.5, -15.5), (-16.5, -14.5), (-15.5, -14.5), (-15.5, -15.5), (-14.5, -15.5), (-14.5, -16.5), align=None)
    extrude(amount=-CUT_EXTRUDE4_DEPTH, mode=Mode.SUBTRACT)

    # Sketch11 → Boss-Extrude6 (add)
    with BuildSketch(Plane(origin=(0, 0, -26.5), x_dir=(-1, 0, 0), z_dir=(0, 0, -1)).offset(BOSS_EXTRUDE6_START)):
        with BuildLine():
            Line((-21.125, -16), (-21.125, 16))
            ThreePointArc((-21.125, 16), (-19.623922254, 19.623922254), (-16, 21.125))
            Line((-16, 21.125), (16, 21.125))
            ThreePointArc((16, 21.125), (19.623922254, 19.623922254), (21.125, 16))
            Line((21.125, 16), (21.125, -16))
            ThreePointArc((21.125, -16), (19.623922254, -19.623922254), (16, -21.125))
            Line((16, -21.125), (-16, -21.125))
            ThreePointArc((-16, -21.125), (-19.623922254, -19.623922254), (-21.125, -16))
        make_face()
        with BuildLine():
            Line((-16, 21), (16, 21))
            ThreePointArc((16, 21), (19.535533906, 19.535533906), (21, 16))
            Line((21, 16), (21, -16))
            ThreePointArc((21, -16), (19.535533906, -19.535533906), (16, -21))
            Line((16, -21), (-16, -21))
            ThreePointArc((-16, -21), (-19.535533906, -19.535533906), (-21, -16))
            Line((-21, -16), (-21, 16))
            ThreePointArc((-21, 16), (-19.535533906, 19.535533906), (-16, 21))
        make_face(mode=Mode.SUBTRACT)
    extrude(amount=BOSS_EXTRUDE6_DEPTH)


solid = part.part
